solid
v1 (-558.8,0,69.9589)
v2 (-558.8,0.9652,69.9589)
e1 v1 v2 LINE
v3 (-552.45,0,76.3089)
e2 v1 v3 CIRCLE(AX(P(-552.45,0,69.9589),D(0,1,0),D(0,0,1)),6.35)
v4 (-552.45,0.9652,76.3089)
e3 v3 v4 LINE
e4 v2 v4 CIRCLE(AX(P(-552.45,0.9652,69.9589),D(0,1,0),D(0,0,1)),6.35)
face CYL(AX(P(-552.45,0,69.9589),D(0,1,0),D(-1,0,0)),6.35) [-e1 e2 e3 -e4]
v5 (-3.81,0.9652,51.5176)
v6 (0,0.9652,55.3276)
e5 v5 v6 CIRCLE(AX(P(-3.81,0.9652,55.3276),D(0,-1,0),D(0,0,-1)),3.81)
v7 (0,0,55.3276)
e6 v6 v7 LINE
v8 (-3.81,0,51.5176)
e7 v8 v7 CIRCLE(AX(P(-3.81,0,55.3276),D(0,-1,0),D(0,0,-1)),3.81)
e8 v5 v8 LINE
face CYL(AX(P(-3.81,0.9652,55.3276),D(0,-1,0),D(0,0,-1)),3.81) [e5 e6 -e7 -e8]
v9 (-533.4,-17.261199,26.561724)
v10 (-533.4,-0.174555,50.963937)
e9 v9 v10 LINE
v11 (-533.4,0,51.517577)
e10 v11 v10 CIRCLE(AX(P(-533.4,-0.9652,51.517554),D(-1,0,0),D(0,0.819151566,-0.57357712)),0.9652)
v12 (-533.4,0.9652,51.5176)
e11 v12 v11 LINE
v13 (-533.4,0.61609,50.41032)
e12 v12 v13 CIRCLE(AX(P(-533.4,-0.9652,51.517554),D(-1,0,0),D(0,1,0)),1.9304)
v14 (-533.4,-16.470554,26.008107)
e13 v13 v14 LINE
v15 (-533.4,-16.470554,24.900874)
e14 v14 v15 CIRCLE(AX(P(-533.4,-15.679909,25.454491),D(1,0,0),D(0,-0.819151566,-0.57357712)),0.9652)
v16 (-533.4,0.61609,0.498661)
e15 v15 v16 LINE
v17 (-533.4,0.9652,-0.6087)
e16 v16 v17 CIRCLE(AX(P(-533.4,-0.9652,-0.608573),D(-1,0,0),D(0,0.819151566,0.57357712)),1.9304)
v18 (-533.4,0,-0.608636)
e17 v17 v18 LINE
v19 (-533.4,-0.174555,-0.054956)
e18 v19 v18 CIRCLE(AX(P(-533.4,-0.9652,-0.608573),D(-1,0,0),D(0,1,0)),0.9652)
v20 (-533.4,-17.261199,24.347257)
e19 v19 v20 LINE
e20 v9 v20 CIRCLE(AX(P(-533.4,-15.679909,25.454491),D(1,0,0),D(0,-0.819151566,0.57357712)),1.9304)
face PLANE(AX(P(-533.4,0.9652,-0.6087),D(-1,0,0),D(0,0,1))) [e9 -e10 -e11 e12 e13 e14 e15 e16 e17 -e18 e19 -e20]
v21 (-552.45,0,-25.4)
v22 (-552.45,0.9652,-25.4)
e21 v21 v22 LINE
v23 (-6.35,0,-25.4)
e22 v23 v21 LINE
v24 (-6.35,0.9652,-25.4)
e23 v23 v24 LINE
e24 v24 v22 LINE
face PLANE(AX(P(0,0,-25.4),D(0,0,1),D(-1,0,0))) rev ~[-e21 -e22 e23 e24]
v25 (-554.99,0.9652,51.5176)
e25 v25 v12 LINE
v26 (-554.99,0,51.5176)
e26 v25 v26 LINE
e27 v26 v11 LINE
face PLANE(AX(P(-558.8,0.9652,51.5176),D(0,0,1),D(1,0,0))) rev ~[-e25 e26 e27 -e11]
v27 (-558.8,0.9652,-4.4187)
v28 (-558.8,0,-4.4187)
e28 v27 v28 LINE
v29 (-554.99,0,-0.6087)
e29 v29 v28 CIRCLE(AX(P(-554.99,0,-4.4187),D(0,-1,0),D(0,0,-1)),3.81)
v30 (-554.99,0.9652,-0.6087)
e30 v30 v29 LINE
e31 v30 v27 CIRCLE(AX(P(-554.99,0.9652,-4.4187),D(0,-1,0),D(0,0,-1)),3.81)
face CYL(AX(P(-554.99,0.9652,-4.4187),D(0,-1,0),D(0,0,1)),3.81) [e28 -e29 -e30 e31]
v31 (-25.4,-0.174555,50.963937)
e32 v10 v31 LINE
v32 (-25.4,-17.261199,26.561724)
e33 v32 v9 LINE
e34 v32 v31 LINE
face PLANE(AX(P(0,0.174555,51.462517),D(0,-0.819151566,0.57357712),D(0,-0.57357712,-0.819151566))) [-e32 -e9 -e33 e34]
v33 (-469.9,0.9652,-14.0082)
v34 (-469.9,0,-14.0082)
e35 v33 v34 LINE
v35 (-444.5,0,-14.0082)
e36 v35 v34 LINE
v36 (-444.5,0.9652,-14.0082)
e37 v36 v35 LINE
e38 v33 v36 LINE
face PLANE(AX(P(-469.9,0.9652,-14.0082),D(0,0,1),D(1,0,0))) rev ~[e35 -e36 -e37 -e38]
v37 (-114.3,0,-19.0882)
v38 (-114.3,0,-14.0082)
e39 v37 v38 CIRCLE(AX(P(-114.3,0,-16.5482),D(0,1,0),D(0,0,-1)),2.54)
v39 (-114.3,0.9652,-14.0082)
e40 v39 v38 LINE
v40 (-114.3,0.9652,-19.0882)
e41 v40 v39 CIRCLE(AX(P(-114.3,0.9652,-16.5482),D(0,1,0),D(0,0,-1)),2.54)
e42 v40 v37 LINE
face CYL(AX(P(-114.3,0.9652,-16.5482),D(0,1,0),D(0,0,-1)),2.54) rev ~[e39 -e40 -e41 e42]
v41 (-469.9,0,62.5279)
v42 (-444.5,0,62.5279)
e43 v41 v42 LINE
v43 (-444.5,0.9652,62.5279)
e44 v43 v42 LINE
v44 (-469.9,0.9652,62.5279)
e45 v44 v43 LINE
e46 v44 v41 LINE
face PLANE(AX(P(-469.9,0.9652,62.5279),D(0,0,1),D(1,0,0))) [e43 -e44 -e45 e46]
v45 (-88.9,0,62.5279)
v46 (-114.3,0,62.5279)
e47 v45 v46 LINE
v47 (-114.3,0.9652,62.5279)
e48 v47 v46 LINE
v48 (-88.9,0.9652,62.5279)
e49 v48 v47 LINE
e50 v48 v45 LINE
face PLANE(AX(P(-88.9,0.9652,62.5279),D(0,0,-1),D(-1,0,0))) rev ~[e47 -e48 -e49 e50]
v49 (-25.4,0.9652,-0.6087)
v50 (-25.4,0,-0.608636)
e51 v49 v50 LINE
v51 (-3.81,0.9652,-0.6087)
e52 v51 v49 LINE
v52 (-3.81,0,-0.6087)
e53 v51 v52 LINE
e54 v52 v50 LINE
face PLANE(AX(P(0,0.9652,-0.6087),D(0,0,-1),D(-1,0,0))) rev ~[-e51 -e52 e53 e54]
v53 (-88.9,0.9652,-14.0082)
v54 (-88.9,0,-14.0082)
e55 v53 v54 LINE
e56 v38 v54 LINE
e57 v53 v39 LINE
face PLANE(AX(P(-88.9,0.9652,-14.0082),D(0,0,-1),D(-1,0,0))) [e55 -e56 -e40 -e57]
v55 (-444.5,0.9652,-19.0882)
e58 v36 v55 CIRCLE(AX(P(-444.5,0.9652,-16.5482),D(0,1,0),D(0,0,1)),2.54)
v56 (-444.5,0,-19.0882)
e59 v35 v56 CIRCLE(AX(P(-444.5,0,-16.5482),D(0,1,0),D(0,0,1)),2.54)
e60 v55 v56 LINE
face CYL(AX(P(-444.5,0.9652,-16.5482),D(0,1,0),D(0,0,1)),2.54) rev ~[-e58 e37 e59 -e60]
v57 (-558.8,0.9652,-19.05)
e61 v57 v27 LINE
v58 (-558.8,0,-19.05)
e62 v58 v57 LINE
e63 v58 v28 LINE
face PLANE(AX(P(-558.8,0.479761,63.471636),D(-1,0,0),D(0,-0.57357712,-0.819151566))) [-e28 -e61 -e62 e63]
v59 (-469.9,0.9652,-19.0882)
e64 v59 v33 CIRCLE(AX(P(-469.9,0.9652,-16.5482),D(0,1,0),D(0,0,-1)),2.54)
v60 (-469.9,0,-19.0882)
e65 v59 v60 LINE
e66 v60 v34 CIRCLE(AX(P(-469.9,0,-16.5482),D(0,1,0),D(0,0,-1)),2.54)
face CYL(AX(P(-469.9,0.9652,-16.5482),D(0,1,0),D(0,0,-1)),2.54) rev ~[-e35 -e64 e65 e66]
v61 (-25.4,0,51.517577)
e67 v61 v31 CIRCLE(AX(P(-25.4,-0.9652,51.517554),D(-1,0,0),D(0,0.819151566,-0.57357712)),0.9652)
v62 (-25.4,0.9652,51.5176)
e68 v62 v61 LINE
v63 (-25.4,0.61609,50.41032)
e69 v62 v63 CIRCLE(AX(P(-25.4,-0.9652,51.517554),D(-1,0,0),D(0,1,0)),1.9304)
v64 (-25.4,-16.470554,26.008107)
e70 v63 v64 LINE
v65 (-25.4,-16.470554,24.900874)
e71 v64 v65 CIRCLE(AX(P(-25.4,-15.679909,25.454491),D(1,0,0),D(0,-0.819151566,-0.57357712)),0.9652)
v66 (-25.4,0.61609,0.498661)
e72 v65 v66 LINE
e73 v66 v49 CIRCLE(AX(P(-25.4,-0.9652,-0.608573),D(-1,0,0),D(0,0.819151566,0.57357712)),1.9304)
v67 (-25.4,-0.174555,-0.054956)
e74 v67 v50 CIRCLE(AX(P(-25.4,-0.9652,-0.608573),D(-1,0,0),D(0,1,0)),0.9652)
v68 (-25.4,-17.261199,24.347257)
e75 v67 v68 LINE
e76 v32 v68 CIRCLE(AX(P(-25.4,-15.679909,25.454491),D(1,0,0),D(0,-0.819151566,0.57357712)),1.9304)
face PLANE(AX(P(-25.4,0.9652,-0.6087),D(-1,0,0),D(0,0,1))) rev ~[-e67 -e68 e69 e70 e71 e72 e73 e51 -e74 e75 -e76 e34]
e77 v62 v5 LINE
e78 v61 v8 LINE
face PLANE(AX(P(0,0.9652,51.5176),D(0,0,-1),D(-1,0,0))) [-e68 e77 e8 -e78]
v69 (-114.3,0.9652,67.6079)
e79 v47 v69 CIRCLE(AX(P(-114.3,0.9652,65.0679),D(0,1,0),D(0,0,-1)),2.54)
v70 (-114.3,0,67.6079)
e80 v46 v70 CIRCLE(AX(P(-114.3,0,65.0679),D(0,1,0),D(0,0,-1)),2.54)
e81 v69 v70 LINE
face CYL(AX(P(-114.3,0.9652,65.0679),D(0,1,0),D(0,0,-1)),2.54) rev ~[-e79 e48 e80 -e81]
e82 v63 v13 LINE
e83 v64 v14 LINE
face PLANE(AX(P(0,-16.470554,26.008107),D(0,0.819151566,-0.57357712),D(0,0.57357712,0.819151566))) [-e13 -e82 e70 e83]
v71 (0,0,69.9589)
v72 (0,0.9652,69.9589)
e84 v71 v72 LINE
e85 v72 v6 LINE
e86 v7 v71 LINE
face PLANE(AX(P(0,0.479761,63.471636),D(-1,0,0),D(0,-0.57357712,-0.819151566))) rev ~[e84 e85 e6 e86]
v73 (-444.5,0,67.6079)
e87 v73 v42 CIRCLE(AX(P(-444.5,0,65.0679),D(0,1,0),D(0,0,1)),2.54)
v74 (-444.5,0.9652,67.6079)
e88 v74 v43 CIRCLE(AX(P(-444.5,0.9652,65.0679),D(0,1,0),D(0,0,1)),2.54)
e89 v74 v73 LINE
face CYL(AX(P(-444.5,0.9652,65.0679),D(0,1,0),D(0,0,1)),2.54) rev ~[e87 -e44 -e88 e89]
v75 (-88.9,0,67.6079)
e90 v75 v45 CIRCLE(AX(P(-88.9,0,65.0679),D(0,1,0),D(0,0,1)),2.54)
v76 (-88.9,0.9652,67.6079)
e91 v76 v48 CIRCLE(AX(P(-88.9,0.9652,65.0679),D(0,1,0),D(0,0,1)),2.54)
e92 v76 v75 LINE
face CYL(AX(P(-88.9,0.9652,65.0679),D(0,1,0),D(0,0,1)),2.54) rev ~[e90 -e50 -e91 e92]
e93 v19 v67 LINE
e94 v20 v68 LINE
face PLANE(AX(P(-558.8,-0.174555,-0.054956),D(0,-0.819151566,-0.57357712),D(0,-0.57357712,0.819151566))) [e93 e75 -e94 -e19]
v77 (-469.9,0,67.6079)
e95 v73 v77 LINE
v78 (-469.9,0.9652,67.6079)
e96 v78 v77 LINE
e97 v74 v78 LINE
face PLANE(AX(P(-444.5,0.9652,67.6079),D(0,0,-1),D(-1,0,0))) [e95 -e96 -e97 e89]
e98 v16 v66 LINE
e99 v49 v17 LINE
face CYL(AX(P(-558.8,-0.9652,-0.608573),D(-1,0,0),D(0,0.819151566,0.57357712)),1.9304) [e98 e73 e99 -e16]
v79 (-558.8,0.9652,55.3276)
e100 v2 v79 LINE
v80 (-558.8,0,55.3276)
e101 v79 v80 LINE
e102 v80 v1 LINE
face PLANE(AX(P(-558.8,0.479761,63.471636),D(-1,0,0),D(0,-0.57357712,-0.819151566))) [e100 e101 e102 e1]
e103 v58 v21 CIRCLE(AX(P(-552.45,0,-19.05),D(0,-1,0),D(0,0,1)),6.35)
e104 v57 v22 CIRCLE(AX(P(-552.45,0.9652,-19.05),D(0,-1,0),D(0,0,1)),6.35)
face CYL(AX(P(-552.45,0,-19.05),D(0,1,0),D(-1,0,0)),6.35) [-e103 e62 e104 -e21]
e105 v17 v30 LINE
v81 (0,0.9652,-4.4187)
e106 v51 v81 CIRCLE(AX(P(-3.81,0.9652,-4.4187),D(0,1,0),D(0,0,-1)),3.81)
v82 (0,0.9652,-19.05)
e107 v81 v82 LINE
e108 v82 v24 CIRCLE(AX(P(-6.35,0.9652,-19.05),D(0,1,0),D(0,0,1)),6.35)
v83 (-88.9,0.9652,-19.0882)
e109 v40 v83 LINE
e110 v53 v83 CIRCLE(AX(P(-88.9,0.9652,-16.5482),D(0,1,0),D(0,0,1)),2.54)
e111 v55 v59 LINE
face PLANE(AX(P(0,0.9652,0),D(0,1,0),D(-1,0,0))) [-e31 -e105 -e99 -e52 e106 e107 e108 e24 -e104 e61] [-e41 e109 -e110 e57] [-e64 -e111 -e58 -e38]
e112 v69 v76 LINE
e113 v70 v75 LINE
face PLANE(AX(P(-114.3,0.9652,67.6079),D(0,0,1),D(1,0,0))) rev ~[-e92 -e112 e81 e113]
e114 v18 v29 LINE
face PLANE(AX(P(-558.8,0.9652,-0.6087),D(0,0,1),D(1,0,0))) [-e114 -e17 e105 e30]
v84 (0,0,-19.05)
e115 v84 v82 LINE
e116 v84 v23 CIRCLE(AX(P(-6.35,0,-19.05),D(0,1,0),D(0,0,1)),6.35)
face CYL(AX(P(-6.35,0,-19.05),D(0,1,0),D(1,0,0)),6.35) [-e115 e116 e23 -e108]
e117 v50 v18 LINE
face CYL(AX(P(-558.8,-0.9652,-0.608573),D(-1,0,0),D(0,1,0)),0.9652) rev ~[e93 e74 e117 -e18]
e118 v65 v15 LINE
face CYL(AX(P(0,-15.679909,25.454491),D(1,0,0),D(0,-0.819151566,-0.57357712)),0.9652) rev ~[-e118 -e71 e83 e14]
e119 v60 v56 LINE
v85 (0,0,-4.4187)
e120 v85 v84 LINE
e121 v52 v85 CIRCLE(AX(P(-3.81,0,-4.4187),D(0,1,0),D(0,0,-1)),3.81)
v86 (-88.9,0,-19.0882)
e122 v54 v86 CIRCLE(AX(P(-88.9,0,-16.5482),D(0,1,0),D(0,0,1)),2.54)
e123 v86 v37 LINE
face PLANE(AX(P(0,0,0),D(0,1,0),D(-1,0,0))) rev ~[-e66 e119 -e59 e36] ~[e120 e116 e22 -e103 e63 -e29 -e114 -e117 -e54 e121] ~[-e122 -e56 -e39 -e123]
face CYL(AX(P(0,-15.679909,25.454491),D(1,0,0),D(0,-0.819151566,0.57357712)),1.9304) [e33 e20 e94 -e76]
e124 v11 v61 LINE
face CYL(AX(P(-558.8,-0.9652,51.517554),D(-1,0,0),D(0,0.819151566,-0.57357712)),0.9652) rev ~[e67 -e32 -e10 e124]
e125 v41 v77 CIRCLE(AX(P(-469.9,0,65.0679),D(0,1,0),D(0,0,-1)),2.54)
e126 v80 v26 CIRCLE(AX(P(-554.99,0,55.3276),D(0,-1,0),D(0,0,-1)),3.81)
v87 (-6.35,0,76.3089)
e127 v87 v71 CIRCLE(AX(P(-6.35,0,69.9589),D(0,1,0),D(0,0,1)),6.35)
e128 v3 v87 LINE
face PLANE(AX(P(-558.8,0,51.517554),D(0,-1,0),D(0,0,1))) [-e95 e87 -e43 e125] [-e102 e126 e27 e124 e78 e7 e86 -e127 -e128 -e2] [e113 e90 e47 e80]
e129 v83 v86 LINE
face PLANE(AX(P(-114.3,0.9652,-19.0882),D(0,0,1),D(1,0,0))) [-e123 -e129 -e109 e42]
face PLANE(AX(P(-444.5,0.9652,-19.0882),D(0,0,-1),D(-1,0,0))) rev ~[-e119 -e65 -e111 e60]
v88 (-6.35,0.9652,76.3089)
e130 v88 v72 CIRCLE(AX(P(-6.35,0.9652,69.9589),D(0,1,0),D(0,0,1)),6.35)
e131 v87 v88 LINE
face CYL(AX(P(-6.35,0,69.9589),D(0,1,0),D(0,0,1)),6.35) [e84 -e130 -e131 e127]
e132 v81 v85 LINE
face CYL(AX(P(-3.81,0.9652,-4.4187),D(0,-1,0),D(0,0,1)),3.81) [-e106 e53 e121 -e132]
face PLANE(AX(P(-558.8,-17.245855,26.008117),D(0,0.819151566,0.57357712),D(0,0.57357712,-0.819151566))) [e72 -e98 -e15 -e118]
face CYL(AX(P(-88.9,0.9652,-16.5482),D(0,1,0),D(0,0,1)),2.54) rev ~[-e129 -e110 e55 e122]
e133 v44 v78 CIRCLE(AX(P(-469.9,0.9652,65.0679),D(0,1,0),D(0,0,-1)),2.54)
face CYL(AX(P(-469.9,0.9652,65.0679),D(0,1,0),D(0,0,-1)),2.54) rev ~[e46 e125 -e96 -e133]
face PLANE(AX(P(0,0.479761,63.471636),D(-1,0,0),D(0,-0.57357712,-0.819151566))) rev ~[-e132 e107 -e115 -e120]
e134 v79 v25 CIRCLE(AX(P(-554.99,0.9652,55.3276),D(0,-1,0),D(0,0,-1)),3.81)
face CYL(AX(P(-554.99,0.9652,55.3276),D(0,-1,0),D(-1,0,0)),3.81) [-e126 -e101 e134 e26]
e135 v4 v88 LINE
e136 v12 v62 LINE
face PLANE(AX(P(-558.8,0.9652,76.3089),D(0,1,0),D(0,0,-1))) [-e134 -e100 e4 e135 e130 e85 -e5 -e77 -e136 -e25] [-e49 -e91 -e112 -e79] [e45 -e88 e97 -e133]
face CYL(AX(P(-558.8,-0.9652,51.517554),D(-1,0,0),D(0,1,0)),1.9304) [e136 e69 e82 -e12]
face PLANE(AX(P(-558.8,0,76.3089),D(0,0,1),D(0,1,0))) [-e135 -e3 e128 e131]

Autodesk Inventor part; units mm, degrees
ref_plane "YZ Plane" through (0, 0, 0) normal (1, 0, 0) x (0, 1, 0)
ref_plane "XZ Plane" through (0, 0, 0) normal (0, 1, 0) x (-1, 0, 0)
ref_plane "XY Plane" through (0, 0, 0) normal (0, 0, 1) x (1, 0, 0)
sketch "Sketch1" plane through (0, 0, 0) normal (0, 1, 0) x (-1, 0, 0)
  line L0 (0, 0) -> (0, -25.4)
  line L1 (0, -25.4) -> (558.8, -25.4)
  line L2 (558.8, -25.4) -> (558.8, 0)
  line L3 (558.8, 0) -> (0, 0)
  dimension "d0" = 25.4
  dimension "d1" = 558.8
extrude "Plate1" add sketch "Sketch1" along normal blind 0.9652
sketch "Sketch2" plane through (-558.8, 0.1746, -0.5536) normal (0, 0.819152, 0.5735764) x (-1, 0, 0)
  line L0 (-558.8, 0) -> (0, 0)
  line L1 (0, 0) -> (0, 31.75)
  line L2 (0, 31.75) -> (-558.8, 31.75)
  line L3 (-558.8, 31.75) -> (-558.8, 0)
edge flange "Flange1" height 31.75 angle 35 thickness 0.9652 bend radius 0.9652 thickness toward (0, 0.819152, 0.5735764) relief tear relief width 0.9652 relief depth 0.4826 edges at (-279.4, 0, 0) wall of the first edge with corners at (0, 0.1746, -0.5536) (-558.8, 0.1746, -0.5536) (-558.8, -18.0365, 25.4545) (0, -18.0365, 25.4545)
bend "Bend1"
corner "Corner1"
sketch "Sketch3" plane through (0, -17.2459, 24.9008) normal (0, -0.819152, 0.5735764) x (1, 0, 0)
  line L0 (-558.8, 0) -> (0, 0)
  line L1 (0, 0) -> (0, 31.75)
  line L2 (0, 31.75) -> (-558.8, 31.75)
  line L3 (-558.8, 31.75) -> (-558.8, 0)
edge flange "Flange2" height 31.75 angle 70 thickness 0.9652 bend radius 0.9652 thickness toward (0, -0.819152, 0.5735764) relief tear relief width 0.9652 relief depth 0.4826 edges at (-279.4, -17.2459, 26.0081) wall of the first edge with corners at (-558.8, -17.2459, 24.9008) (0, -17.2459, 24.9008) (0, 0.9652, 50.9089) (-558.8, 0.9652, 50.9089)
bend "Bend2"
corner "Corner2"
sketch "Sketch4" plane through (-558.8, 0, 50.9089) normal (0, 1, 0) x (-1, 0, 0)
  line L0 (-558.8, 0) -> (0, 0)
  line L1 (0, 0) -> (0, 25.4)
  line L2 (0, 25.4) -> (-558.8, 25.4)
  line L3 (-558.8, 25.4) -> (-558.8, 0)
edge flange "Flange3" height 25.4 angle 35 thickness 0.9652 bend radius 0.9652 thickness toward (0, 1, 0) relief tear relief width 0.9652 relief depth 0.4826 edges at (-279.4, 0.1746, 51.4625) wall of the first edge with corners at (0, 0, 50.9089) (-558.8, 0, 50.9089) (-558.8, 0, 76.3089) (0, 0, 76.3089)
bend "Bend3"
corner "Corner3"
sketch "Sketch5" plane through (0, 0.9652, 0) normal (0, 1, 0) x (1, 0, 0)
  line L0 (0, -51.5176) -> (-25.4, -51.5176)
  line L1 (0, -51.5176) -> (0, -50.4103) projected
  line L2 (0, -51.5176) -> (0, 0.6087)
  line L3 (0, 0.6087) -> (-25.4, 0.6087)
  line L4 (-25.4, 0.6087) -> (-25.4, -51.5176)
  line L5 (-114.3, -65.0679) -> (-88.9, -65.0679) construction
  line L6 (-114.3, -67.6079) -> (-88.9, -67.6079)
  line L7 (-88.9, -62.5279) -> (-114.3, -62.5279)
  arc A0 (-114.3, -62.5279) -> (-114.3, -67.6079) centre (-114.3, -65.0679) ccw
  arc A1 (-88.9, -67.6079) -> (-88.9, -62.5279) centre (-88.9, -65.0679) ccw
  line L8 (-87.7062, -24.2598) -> (31.8104, -24.2598) construction
  line L9 (-114.3, 19.0882) -> (-88.9, 19.0882)
  line L10 (-88.9, 14.0082) -> (-114.3, 14.0082)
  arc A2 (-114.3, 19.0882) -> (-114.3, 14.0082) centre (-114.3, 16.5482) ccw
  arc A3 (-88.9, 14.0082) -> (-88.9, 19.0882) centre (-88.9, 16.5482) ccw
  line L11 (0, -76.3089) -> (-558.8, -76.3089) projected
  line L12 (-279.4, -268.3812) -> (-279.4, 122.1946) construction
  line L13 (-558.8, -51.5176) -> (-533.4, -51.5176)
  line L14 (-558.8, -51.5176) -> (-558.8, 0.6087)
  line L15 (-558.8, 0.6087) -> (-533.4, 0.6087)
  line L16 (-533.4, 0.6087) -> (-533.4, -51.5176)
  line L17 (-444.5, -67.6079) -> (-469.9, -67.6079)
  line L18 (-469.9, -62.5279) -> (-444.5, -62.5279)
  arc A4 (-444.5, -67.6079) -> (-444.5, -62.5279) centre (-444.5, -65.0679) ccw
  arc A5 (-469.9, -62.5279) -> (-469.9, -67.6079) centre (-469.9, -65.0679) ccw
  line L19 (-469.9, 14.0082) -> (-444.5, 14.0082)
  arc A6 (-444.5, 14.0082) -> (-444.5, 19.0882) centre (-444.5, 16.5482) ccw
  line L20 (-444.5, 19.0882) -> (-469.9, 19.0882)
  arc A7 (-469.9, 19.0882) -> (-469.9, 14.0082) centre (-469.9, 16.5482) ccw
  line L21 (0, -51.5176) -> (0, -76.3089) projected
  point P0 (0, 0)
  point P1 (-101.6, -65.0679)
  point P2 (-457.2, -65.0679)
  dimension "d36" = 25.4
  dimension "d37" = 25.4
  dimension "d38" = 5.08
  dimension "d41" = 88.9
extrude "Cut1" cut sketch "Sketch5" against normal up to next
fillet "Corner Round1" radius 6.35 4 edges at (0, 0.4826, -25.4) (-558.8, 0.4826, 76.3089) (-558.8, 0.4826, -25.4) (0, 0.4826, 76.3089)
fillet "Corner Round2" radius 3.81 4 edges at (-558.8, 0.4826, 51.5176) (0, 0.4826, -0.6087) (0, 0.4826, 51.5176) (-558.8, 0.4826, -0.6087)
sketch "Sketch6" plane through (-533.4, 0.9652, 51.5176) normal (0, 1, 0) x (1, 0, 0)
  point P0 (533.4, 51.5176)
equation "\"d39\" = Thickness"
equation "\"d3\" = BendReliefWidth"
equation "\"d4\" = BendReliefDepth"
equation "\"d5\" = MinimumRemnant"
equation "\"d6\" = BendRadius"
equation "\"d9\" = BendRadius"
equation "\"d10\" = CornerReliefSize"
equation "\"d11\" = GapSize"
equation "\"d12\" = JacobiRadiusSize"
equation "\"d13\" = BendReliefWidth"
equation "\"d14\" = BendReliefDepth"
equation "\"d15\" = MinimumRemnant"
equation "\"d16\" = BendRadius"
equation "\"d19\" = BendRadius"
equation "\"d20\" = CornerReliefSize"
equation "\"d21\" = GapSize"
equation "\"d22\" = JacobiRadiusSize"
equation "\"d23\" = BendReliefWidth"
equation "\"d24\" = BendReliefDepth"
equation "\"d25\" = MinimumRemnant"
equation "\"d26\" = BendRadius"
equation "\"d29\" = BendRadius"
equation "\"d30\" = CornerReliefSize"
equation "\"d31\" = GapSize"
equation "\"d32\" = JacobiRadiusSize"
equation "\"BendRadius\" = Thickness"
equation "\"BendReliefWidth\" = Thickness"
equation "\"BendReliefDepth\" = 0.5 * Thickness"
equation "\"CornerReliefSize\" = 4 * Thickness"
equation "\"MinimumRemnant\" = 2 * Thickness"
equation "\"TransitionRadius\" = BendRadius"
equation "\"JacobiRadiusSize\" = BendRadius"
equation "\"GapSize\" = Thickness"
equation "\"d2\" = BendRadius"
equation "\"Thickness\" = 0.9652"
properties part number "Control pipe holder V2" material "Stainless Steel"
